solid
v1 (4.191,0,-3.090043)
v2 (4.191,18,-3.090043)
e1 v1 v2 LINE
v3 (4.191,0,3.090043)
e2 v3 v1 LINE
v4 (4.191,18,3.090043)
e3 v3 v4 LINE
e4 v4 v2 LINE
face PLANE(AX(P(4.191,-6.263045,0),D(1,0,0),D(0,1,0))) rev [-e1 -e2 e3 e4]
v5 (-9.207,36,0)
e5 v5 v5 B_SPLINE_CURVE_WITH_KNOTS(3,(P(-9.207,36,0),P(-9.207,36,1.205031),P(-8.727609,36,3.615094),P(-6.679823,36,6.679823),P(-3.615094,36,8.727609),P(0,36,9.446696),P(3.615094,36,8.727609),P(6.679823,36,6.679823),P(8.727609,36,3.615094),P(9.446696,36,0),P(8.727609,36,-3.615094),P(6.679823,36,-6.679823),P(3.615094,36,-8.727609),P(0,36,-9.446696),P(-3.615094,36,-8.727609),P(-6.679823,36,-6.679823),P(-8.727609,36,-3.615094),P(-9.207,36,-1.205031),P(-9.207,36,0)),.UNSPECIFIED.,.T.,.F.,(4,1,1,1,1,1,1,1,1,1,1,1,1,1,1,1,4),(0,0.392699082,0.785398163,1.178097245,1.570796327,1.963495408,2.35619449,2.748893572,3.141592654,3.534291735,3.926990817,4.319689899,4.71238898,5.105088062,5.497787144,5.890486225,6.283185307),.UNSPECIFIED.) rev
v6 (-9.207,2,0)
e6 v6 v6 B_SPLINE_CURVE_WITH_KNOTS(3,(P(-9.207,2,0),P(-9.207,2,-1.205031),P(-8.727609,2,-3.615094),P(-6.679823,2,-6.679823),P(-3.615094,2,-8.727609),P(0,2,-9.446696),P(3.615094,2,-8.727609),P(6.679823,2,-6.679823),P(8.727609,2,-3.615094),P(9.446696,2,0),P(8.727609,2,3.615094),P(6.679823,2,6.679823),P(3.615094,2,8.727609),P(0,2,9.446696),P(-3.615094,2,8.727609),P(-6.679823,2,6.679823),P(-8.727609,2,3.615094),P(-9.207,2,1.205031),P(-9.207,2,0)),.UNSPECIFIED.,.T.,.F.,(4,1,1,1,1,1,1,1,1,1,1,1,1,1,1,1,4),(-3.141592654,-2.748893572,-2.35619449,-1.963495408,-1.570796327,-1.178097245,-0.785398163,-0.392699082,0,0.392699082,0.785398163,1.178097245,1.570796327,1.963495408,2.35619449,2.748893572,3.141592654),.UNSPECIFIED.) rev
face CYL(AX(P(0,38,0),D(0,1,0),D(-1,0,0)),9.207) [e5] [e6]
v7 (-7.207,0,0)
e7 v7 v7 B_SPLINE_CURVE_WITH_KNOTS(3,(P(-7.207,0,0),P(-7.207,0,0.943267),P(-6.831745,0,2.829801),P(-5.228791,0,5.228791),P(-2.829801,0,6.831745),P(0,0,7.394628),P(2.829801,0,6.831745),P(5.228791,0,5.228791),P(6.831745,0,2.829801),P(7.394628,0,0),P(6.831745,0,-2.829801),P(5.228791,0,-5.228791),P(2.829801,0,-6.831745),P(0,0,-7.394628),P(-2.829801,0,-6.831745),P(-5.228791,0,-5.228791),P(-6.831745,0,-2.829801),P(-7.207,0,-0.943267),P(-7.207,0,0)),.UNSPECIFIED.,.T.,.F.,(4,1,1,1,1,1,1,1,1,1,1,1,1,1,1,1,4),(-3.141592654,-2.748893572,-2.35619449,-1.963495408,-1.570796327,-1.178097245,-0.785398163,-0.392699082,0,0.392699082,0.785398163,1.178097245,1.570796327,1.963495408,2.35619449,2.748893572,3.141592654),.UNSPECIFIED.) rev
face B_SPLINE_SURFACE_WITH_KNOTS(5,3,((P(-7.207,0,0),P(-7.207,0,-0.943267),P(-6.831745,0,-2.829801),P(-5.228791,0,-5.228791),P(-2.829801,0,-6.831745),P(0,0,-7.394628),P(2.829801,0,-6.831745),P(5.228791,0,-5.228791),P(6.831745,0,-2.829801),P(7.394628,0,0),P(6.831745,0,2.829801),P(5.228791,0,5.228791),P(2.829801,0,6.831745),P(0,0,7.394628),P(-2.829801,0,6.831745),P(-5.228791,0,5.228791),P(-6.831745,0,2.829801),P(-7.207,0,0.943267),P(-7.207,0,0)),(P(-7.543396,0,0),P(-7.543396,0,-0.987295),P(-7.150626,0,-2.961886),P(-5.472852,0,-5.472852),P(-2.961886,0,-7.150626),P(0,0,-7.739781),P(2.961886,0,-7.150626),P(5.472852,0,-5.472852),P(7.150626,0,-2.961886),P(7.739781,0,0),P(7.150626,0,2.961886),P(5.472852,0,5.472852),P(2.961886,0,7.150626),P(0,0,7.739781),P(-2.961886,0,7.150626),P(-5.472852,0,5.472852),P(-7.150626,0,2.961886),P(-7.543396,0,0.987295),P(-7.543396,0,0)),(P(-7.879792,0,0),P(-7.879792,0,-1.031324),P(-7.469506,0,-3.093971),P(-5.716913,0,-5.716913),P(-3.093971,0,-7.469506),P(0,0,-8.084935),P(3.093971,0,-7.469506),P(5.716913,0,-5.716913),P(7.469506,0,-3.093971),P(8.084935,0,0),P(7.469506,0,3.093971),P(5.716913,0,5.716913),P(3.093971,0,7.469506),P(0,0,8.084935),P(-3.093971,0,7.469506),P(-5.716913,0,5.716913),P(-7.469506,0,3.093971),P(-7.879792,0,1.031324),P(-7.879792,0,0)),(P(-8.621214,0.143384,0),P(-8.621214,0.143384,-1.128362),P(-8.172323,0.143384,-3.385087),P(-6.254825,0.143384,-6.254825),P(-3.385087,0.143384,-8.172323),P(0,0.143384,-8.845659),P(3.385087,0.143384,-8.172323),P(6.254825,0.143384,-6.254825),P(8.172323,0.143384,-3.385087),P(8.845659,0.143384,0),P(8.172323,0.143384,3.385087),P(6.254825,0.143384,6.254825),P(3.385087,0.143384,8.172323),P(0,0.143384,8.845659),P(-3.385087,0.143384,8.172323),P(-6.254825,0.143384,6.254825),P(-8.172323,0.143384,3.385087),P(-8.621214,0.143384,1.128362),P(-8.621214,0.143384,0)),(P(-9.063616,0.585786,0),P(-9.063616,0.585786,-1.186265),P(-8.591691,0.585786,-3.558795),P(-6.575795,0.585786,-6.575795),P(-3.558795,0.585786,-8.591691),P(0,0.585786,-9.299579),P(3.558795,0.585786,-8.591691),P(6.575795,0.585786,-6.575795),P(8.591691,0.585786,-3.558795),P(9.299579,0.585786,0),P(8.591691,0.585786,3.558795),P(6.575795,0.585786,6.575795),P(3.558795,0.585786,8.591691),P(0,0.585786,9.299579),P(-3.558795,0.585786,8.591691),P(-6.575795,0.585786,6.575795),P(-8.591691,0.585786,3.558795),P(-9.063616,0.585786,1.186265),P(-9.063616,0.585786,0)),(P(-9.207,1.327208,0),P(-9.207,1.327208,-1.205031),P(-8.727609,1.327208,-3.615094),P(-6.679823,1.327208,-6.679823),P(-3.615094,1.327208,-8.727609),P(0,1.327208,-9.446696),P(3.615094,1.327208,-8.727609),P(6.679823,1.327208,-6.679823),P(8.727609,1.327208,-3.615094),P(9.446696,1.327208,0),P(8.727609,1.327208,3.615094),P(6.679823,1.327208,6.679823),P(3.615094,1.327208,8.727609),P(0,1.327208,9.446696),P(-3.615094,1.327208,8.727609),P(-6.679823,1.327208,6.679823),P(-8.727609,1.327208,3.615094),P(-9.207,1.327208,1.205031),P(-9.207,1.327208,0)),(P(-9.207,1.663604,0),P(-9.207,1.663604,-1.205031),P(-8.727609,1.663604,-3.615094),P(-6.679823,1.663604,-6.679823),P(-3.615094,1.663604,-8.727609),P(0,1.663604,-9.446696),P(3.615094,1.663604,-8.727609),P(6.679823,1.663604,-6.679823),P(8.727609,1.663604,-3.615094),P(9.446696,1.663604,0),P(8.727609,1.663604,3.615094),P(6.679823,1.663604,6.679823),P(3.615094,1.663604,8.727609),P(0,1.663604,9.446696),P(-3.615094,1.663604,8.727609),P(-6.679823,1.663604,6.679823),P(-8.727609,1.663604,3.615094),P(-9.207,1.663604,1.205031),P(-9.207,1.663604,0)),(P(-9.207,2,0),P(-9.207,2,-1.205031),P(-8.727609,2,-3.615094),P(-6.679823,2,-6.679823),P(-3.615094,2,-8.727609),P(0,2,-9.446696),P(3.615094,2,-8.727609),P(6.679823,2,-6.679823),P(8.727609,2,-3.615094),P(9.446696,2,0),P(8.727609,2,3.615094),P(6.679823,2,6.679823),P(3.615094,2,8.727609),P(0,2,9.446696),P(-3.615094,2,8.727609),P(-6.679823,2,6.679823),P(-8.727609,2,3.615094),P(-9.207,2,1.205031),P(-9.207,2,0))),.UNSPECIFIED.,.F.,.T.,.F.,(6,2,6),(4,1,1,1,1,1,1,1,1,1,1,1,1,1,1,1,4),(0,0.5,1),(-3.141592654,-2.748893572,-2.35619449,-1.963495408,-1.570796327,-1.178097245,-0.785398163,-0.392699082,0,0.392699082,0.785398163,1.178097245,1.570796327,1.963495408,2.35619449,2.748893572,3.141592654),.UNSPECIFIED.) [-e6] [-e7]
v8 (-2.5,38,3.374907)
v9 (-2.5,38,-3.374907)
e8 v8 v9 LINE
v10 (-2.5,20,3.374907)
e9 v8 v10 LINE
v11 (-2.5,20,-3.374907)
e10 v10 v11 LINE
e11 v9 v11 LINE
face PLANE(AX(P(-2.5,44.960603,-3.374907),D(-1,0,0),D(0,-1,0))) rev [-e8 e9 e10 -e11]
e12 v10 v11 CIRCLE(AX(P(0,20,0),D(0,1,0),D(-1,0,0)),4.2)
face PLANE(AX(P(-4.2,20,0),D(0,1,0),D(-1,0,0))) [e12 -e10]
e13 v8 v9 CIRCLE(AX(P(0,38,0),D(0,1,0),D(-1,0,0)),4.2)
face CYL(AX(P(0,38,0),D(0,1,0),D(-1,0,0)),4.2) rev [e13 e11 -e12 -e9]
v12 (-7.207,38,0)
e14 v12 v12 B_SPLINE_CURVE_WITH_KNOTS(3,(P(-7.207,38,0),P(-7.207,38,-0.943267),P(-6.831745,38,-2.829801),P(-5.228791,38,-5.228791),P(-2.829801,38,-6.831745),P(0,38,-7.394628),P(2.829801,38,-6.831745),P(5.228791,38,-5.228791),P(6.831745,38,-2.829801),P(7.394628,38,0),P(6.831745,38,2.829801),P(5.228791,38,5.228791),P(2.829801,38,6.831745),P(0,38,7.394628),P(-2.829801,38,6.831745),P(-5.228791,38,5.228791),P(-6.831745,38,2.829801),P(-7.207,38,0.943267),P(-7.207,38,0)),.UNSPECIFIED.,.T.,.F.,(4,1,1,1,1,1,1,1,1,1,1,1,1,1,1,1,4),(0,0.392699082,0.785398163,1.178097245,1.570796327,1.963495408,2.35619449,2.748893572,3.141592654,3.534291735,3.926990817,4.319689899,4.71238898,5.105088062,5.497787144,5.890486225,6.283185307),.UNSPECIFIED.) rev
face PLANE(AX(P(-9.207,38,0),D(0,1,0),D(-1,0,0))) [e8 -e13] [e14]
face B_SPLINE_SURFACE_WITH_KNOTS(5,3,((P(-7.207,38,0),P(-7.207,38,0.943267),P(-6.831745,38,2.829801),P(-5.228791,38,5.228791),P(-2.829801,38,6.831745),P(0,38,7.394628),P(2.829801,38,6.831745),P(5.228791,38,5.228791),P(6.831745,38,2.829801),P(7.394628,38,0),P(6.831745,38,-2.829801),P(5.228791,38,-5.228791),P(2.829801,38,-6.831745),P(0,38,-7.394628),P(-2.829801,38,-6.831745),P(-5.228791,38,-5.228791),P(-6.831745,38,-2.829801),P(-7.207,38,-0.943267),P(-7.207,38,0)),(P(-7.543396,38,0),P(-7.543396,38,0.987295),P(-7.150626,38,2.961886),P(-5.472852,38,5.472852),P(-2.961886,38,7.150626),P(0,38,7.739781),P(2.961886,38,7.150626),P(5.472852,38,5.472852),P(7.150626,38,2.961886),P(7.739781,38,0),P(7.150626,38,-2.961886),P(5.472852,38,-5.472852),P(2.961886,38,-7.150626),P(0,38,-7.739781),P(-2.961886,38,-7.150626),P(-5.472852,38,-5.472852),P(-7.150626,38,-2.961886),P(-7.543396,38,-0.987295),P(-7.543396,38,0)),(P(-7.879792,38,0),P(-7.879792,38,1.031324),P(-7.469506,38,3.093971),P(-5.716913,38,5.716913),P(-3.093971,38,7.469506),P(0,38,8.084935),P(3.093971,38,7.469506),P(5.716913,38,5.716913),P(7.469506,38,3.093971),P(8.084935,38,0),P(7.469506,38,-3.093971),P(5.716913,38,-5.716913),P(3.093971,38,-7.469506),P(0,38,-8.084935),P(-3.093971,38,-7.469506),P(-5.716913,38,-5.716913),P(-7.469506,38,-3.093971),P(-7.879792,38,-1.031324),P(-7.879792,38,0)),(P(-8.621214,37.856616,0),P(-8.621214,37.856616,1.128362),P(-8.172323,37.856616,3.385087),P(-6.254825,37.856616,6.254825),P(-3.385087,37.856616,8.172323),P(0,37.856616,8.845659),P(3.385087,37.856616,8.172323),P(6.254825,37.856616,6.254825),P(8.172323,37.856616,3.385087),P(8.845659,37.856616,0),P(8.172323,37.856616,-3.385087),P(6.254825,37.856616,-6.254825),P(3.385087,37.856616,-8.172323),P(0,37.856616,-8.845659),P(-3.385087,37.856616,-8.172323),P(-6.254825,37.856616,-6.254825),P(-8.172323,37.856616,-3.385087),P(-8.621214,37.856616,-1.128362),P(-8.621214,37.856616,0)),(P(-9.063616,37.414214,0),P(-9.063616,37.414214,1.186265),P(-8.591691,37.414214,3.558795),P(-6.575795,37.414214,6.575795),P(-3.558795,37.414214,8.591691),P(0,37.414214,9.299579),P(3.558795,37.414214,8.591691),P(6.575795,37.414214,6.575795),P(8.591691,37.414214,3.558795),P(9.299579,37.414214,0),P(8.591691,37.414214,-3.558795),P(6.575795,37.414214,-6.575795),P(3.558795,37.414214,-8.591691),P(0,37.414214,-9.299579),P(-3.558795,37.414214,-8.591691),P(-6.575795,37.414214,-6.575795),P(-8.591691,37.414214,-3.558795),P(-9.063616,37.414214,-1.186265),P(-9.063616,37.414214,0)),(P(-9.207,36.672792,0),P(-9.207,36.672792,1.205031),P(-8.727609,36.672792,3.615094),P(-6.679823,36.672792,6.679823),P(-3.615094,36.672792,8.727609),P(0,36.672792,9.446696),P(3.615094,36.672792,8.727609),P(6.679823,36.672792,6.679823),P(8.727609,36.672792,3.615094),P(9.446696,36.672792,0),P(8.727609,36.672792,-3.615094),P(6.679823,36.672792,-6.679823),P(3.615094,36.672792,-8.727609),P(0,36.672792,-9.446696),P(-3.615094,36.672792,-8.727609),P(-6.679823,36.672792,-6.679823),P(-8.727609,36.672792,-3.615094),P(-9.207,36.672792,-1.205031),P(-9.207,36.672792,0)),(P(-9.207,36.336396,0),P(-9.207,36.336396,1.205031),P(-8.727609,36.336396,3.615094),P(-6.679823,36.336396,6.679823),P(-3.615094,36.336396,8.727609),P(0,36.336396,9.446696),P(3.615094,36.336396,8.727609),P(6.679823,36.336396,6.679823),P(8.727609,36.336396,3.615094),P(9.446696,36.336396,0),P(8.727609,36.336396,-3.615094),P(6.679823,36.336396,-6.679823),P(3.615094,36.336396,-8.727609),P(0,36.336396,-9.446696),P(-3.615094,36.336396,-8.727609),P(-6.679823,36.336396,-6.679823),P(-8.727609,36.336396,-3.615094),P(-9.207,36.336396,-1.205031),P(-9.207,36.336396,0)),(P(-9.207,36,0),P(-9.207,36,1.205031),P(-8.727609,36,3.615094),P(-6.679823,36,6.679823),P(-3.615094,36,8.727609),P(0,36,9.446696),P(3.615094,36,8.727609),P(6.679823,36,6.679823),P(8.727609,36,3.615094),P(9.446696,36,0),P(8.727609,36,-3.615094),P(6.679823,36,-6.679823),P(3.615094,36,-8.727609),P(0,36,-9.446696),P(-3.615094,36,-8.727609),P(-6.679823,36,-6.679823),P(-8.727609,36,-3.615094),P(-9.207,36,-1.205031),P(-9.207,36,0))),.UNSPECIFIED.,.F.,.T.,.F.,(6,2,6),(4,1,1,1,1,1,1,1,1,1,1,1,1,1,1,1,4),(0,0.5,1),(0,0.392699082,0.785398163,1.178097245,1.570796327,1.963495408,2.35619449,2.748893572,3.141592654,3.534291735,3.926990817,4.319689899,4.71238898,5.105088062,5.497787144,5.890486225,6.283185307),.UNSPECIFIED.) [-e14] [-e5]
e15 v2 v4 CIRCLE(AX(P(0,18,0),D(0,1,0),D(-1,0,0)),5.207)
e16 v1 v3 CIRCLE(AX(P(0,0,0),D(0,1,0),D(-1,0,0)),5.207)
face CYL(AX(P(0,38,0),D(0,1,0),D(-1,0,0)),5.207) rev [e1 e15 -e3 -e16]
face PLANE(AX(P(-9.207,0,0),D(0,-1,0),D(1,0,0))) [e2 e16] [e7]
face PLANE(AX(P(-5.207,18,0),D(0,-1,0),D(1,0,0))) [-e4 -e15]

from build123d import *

# Parameters (mm, degrees)
BOSS_EXTRUDE1_START = 18
BOSS_EXTRUDE1_DEPTH = 18
BOSS_EXTRUDE2_DEPTH = 18
FILLET1_SIZE        = 2


with BuildPart() as part:
    # Sketch1 → Revolve1 (revolve)
    with BuildSketch(Plane.XY):
        Polygon((-9.207, 38), (-9.207, 0), (-5.207, 0), (-5.207, 18), (0, 18), (0, 20), (-4.2, 20), (-4.2, 38), align=None)
    revolve(axis=Axis((0, 38, 0), (0, -1, 0)))

    # Sketch3 → Boss-Extrude1 (add)
    with BuildSketch(Plane(origin=(0, 20, 0), x_dir=(1, 0, 0), z_dir=(0, 1, 0)).offset(BOSS_EXTRUDE1_START)):
        with BuildLine():
            Line((-2.5, 3.374907406), (-2.5, -3.374907406))
            ThreePointArc((-2.5, -3.374907406), (-4.2, 0), (-2.5, 3.374907406))
        make_face()
    extrude(amount=-BOSS_EXTRUDE1_DEPTH)

    # Sketch2 → Boss-Extrude2 (add)
    with BuildSketch(Plane.XZ.offset(-18)):
        with BuildLine():
            ThreePointArc((5.207, 0), (4.946482892, 1.626393556), (4.191, 3.090043365))
            Line((4.191, 3.090043365), (4.191, -3.090043365))
            ThreePointArc((4.191, -3.090043365), (4.946482892, -1.626393556), (5.207, 0))
        make_face()
    extrude(amount=BOSS_EXTRUDE2_DEPTH)

    # Fillet1
    # a fillet whose section is not a circle: 2 mm, written as the material it takes off along each edge
    with BuildSketch(Plane(origin=(0, 0, 0), x_dir=(-1, 0, 0), z_dir=(0, 0, 1))) as fillet1_piece_1:
        with BuildLine():
            add(Edge.make_bspline([(9.207, -FILLET1_SIZE), (9.207, -FILLET1_SIZE * 0.831801948466), (9.207, -FILLET1_SIZE * 0.663603896932), (9.207 - FILLET1_SIZE * 0.0716919198361, -FILLET1_SIZE * 0.292893218813), (9.207 - FILLET1_SIZE * 0.292893218813, -FILLET1_SIZE * 0.0716919198361), (9.207 - FILLET1_SIZE * 0.663603896932, 0), (9.207 - FILLET1_SIZE * 0.831801948466, 0), (9.207 - FILLET1_SIZE, 0)], knots=[0, 0, 0, 0, 0, 0, 0.5, 0.5, 1, 1, 1, 1, 1, 1], degree=5))
            Line((9.207 - FILLET1_SIZE, 0), (9.207, 0))
            Line((9.207, 0), (9.207, -FILLET1_SIZE))
        make_face()
    revolve(axis=Axis((0, 0, 0), (0, -1, 0)), mode=Mode.SUBTRACT)
    with BuildSketch(Plane(origin=(0, 38, 0), x_dir=(-1, 0, 0), z_dir=(0, 0, 1))) as fillet1_piece_2:
        with BuildLine():
            add(Edge.make_bspline([(9.207, FILLET1_SIZE), (9.207, FILLET1_SIZE * 0.831801948466), (9.207, FILLET1_SIZE * 0.663603896932), (9.207 - FILLET1_SIZE * 0.0716919198361, FILLET1_SIZE * 0.292893218813), (9.207 - FILLET1_SIZE * 0.292893218813, FILLET1_SIZE * 0.0716919198361), (9.207 - FILLET1_SIZE * 0.663603896932, 0), (9.207 - FILLET1_SIZE * 0.831801948466, 0), (9.207 - FILLET1_SIZE, 0)], knots=[0, 0, 0, 0, 0, 0, 0.5, 0.5, 1, 1, 1, 1, 1, 1], degree=5))
            Line((9.207 - FILLET1_SIZE, 0), (9.207, 0))
            Line((9.207, 0), (9.207, FILLET1_SIZE))
        make_face()
    revolve(axis=Axis((0, 38, 0), (0, -1, 0)), mode=Mode.SUBTRACT)


solid = part.part
